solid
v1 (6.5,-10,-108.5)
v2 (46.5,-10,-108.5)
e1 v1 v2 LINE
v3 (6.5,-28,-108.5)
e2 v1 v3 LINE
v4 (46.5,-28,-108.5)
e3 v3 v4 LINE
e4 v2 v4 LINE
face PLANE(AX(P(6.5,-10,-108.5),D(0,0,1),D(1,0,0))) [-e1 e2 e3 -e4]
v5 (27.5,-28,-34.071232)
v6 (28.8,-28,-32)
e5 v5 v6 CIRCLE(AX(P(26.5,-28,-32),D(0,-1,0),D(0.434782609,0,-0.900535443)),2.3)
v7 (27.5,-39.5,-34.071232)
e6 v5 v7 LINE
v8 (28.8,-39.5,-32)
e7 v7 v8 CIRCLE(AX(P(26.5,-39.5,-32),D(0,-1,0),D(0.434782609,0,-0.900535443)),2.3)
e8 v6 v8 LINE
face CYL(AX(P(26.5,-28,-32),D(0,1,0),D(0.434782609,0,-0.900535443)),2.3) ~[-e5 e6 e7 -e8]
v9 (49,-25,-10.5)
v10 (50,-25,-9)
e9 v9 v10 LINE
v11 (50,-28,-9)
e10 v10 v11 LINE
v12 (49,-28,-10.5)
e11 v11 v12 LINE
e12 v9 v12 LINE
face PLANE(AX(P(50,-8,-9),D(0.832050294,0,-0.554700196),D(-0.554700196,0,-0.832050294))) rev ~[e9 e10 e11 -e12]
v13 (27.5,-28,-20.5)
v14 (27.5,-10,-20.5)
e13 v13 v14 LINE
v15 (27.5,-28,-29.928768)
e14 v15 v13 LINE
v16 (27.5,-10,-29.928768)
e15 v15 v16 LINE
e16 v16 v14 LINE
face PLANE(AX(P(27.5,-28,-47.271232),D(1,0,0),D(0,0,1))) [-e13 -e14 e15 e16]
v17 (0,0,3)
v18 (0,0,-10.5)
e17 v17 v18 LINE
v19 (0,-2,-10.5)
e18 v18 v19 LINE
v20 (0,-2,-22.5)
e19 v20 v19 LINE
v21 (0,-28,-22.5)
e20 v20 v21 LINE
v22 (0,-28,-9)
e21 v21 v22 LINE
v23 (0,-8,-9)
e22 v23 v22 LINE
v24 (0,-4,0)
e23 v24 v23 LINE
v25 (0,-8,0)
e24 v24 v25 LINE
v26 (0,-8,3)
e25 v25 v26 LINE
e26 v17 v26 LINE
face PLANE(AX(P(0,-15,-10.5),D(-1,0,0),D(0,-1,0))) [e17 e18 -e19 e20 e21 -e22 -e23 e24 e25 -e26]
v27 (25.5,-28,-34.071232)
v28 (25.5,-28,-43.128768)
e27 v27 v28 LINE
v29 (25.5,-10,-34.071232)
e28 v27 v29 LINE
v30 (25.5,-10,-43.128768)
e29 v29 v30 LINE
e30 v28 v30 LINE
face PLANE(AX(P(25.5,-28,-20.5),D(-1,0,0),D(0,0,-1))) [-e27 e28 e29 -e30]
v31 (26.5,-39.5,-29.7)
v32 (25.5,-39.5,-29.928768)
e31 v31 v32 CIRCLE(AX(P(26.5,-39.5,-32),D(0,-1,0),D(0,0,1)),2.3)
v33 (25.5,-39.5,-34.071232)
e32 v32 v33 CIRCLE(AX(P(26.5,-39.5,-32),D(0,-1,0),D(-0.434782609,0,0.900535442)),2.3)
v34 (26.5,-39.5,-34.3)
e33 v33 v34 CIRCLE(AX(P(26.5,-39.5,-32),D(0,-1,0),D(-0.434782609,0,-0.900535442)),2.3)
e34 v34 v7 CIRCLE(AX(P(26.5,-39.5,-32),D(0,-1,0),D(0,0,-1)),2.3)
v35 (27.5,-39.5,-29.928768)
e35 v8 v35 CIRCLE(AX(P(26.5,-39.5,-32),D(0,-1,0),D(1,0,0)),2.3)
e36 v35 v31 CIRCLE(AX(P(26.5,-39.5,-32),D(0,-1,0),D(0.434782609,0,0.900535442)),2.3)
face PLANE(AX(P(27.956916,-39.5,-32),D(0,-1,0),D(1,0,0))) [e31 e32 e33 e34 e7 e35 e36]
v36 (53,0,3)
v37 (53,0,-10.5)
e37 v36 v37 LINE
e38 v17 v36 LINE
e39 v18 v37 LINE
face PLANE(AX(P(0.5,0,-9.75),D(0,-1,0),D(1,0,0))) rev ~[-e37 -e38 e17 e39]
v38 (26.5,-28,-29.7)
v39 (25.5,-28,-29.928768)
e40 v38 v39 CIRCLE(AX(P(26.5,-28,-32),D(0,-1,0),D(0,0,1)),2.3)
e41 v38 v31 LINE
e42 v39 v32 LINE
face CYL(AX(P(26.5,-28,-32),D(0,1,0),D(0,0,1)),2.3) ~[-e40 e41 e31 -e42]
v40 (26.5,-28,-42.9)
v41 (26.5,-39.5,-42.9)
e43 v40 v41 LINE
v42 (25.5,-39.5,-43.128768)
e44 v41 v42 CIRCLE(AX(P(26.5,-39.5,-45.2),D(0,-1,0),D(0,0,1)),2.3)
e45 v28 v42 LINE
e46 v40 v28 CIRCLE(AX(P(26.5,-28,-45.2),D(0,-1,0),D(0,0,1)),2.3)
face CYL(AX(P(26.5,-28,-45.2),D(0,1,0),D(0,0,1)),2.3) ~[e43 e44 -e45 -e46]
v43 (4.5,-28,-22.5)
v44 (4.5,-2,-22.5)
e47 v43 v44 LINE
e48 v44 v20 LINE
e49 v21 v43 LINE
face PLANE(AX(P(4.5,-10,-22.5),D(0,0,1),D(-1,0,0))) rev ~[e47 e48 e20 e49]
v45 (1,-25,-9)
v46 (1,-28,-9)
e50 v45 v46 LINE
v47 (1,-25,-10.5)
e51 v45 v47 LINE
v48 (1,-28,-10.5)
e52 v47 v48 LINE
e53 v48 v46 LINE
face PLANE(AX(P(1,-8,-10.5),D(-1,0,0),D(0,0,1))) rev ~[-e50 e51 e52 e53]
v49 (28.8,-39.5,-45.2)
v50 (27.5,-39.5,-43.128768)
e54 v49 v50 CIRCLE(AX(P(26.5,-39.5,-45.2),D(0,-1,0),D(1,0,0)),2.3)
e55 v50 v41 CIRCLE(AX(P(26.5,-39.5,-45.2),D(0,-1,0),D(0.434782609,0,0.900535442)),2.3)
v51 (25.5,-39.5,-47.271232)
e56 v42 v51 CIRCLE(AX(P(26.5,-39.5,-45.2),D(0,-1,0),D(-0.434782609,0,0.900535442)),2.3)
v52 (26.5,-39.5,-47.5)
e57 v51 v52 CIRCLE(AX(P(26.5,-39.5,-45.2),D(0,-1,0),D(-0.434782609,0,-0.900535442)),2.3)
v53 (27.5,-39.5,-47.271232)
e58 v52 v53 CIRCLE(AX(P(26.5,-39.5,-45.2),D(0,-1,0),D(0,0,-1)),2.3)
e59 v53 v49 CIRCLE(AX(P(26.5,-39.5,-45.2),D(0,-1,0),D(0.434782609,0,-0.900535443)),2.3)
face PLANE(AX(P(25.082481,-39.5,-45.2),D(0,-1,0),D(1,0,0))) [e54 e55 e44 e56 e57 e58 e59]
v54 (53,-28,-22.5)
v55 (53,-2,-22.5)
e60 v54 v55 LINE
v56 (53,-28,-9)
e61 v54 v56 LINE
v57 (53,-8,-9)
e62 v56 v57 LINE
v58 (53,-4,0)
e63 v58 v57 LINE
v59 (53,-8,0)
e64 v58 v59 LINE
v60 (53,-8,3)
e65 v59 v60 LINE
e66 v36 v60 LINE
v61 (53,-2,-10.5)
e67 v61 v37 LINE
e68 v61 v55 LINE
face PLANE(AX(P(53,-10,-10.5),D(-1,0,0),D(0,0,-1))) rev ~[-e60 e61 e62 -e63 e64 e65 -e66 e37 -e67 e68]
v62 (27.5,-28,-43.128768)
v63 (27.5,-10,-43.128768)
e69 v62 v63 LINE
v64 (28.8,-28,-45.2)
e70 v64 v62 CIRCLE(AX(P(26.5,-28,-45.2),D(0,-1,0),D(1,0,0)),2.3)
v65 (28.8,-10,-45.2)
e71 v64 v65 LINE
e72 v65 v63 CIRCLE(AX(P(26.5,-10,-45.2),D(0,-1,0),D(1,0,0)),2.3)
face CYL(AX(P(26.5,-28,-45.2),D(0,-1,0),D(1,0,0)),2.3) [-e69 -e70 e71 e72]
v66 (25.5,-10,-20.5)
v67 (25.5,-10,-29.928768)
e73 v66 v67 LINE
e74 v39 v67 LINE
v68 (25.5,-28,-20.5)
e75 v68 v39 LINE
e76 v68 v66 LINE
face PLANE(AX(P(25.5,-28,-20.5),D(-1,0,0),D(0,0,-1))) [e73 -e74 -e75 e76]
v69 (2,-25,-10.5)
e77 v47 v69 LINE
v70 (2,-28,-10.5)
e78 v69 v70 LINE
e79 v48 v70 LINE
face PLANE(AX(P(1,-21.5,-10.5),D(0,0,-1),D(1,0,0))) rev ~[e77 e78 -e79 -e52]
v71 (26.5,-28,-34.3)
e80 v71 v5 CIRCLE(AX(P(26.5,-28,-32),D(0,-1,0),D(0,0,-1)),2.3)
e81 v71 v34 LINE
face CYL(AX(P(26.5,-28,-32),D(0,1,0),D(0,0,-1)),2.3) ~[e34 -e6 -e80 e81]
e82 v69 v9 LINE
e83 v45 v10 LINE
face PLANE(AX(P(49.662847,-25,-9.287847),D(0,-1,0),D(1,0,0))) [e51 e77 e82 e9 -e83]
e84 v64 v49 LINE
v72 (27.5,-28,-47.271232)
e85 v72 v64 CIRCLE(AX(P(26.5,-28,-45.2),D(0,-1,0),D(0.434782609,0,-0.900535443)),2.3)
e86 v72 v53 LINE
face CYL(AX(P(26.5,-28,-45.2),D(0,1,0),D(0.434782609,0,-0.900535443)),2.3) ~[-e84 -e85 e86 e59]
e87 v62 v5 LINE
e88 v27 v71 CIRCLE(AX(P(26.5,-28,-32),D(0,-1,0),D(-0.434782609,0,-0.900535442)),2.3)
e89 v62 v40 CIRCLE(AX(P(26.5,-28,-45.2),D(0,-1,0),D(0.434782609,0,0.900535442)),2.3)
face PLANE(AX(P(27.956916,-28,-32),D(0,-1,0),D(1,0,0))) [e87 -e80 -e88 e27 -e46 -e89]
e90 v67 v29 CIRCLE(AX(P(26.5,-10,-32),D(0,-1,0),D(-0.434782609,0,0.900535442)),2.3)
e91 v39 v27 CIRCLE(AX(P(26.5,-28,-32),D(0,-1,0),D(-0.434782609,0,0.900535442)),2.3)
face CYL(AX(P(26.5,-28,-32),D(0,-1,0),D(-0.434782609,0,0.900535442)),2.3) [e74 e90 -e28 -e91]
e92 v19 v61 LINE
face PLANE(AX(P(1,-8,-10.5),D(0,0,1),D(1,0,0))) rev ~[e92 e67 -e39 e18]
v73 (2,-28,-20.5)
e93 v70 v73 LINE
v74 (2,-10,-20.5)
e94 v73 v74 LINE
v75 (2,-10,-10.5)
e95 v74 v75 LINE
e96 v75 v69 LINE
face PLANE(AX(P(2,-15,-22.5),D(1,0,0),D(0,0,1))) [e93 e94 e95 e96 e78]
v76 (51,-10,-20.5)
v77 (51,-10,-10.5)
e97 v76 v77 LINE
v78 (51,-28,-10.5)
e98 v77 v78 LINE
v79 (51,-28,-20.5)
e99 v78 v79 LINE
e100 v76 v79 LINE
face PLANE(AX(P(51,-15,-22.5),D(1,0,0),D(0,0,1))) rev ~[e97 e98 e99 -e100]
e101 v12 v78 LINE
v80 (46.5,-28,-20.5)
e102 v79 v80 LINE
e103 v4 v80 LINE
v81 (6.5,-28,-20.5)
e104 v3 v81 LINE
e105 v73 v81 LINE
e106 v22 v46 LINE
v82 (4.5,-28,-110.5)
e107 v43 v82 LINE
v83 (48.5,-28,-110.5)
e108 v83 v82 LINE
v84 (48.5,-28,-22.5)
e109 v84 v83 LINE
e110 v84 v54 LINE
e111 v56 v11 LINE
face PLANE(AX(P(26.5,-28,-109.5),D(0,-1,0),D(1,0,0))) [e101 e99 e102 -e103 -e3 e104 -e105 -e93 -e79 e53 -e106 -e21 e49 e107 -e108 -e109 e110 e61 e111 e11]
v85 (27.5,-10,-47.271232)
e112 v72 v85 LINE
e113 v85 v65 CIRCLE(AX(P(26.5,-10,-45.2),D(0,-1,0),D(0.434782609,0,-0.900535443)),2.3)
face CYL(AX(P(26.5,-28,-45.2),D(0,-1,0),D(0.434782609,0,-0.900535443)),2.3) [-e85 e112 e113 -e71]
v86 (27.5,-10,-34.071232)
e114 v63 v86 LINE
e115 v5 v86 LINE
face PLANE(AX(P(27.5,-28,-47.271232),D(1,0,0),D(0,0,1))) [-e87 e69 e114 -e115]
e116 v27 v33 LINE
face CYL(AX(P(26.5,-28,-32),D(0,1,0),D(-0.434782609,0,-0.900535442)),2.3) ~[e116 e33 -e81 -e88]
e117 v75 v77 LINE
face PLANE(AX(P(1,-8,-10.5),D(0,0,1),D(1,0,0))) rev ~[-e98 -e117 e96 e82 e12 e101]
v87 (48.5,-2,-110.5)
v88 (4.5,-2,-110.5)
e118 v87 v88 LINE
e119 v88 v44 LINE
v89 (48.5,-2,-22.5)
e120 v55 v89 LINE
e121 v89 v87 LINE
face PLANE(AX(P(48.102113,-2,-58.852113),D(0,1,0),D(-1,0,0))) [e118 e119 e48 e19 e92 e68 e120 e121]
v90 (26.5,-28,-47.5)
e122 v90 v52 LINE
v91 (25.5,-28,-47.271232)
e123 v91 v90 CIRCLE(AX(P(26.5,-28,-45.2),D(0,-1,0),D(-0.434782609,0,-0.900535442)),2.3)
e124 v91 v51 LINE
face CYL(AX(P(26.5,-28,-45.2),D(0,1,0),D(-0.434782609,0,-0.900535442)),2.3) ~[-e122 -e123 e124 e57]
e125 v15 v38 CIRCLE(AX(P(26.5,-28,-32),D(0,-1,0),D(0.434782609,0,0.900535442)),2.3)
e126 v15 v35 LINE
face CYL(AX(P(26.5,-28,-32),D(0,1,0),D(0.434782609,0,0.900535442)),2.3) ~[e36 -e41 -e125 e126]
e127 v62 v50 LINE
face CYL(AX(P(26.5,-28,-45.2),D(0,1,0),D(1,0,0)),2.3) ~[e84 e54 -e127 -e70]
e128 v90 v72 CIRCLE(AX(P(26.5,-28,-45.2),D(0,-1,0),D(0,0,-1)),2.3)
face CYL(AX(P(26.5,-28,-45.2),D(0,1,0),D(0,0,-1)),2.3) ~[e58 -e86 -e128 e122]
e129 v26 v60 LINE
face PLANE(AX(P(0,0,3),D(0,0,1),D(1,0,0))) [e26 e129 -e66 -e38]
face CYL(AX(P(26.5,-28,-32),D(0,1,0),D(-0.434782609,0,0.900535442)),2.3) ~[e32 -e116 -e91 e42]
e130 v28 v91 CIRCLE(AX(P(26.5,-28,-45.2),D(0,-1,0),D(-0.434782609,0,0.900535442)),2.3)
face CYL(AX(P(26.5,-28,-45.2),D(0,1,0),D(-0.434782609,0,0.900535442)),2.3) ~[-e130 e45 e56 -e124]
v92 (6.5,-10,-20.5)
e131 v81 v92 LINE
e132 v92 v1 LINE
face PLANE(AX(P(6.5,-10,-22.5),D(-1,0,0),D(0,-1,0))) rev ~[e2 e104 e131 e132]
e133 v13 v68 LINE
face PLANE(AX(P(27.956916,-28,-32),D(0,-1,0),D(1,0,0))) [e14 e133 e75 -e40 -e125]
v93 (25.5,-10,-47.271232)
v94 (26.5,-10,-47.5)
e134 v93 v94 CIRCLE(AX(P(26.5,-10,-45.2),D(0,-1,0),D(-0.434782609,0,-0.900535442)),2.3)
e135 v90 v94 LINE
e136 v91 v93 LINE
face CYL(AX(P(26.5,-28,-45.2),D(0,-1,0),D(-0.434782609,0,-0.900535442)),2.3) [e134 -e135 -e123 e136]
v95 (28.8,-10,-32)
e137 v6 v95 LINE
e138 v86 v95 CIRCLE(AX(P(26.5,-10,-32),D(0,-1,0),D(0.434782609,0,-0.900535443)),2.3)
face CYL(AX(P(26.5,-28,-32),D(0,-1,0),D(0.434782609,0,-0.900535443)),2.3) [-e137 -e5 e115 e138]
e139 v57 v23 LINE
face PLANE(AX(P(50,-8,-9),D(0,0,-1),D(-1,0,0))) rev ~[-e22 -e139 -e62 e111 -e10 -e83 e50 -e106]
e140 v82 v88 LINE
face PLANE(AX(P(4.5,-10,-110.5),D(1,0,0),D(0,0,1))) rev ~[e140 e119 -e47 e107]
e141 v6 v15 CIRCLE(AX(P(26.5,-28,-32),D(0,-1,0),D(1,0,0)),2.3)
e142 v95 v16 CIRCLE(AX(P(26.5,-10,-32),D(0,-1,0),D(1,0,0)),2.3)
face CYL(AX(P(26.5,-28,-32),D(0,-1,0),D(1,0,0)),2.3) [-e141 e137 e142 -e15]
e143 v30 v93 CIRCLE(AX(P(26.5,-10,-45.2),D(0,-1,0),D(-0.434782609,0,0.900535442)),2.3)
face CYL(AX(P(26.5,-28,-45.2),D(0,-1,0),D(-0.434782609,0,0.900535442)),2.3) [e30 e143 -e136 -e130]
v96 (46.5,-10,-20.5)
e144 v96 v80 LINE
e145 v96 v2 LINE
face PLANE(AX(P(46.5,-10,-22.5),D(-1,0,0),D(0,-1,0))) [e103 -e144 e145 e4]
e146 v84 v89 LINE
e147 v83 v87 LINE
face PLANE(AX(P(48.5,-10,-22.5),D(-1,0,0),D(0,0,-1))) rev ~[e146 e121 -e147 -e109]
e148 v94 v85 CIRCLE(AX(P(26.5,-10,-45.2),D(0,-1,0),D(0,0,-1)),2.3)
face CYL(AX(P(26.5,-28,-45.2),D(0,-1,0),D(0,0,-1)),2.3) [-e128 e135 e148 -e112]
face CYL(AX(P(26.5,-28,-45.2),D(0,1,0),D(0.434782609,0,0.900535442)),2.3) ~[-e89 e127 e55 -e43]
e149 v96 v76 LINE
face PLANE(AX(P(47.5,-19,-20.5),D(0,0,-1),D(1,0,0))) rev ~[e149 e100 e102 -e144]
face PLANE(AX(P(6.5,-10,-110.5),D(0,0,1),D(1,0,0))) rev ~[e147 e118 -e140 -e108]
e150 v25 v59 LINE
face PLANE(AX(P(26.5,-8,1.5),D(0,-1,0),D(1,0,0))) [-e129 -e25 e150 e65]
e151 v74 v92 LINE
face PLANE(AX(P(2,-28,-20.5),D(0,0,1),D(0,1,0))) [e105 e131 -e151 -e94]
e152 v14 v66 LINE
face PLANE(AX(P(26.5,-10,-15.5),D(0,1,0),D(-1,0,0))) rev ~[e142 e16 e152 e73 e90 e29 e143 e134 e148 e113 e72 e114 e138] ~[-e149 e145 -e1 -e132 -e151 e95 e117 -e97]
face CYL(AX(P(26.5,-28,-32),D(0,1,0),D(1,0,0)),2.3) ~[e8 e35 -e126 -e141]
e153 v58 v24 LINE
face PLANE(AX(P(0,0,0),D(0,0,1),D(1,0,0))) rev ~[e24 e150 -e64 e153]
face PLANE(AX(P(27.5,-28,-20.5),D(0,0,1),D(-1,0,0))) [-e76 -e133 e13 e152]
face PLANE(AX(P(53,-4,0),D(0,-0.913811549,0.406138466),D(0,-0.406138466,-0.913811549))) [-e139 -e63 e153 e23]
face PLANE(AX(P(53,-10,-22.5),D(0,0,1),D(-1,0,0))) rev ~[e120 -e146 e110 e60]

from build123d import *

# Parameters (mm, degrees)
F0_W      = 53
F0_H      = 3
F1_DEPTH  = 8
F3_DEPTH  = 53
F5_DEPTH  = 8
F6_DEPTH  = 17
F7_DEPTH  = 20
F8_W      = 1
F8_H      = 1.5
F9_DEPTH  = 8
F10_DEPTH = 20
F11_DEPTH = 17
F12_W     = 2
F12_H     = 13
F13_DEPTH = 12
F14_W     = 18
F14_H     = 2
F15_DEPTH = 2.5
F16_DEPTH = 8
F17_DEPTH = 17
F18_W     = 2
F18_H     = 18
F19_DEPTH = 2
F20_DEPTH = 88
F21_W     = 2
F21_H     = 13
F22_DEPTH = 12
F23_W     = 18
F23_H     = 2
F24_DEPTH = 4.5
F25_W     = 2
F25_H     = 18
F26_DEPTH = 88
F27_W     = 2
F27_H     = 12
F28_DEPTH = 5
F29_W     = 2
F29_H     = 12
F30_DEPTH = 5
F31_W     = 40
F31_H     = 88
F31_H_2   = 2
F32_DEPTH = 8
F34_DEPTH = 18
F35_DEPTH = 26
F36_DEPTH = 4
F37_DEPTH = 11.5
F38_W     = 40
F38_H     = 2
F39_DEPTH = 18


# Not quite as in the source:
# - a feature names something its author has since deleted; it is built from what else it names


with BuildPart() as f1:
    # F0 (on Front) → F1 (new body)
    with BuildSketch(Plane.XZ):
        with Locations((26.5, 1.5)):
            Rectangle(F0_W, F0_H)
    extrude(amount=F1_DEPTH)

    # F2 (on face) → F3 (join)
    with BuildSketch(Plane.YZ.offset(53)):
        Polygon((0, -9), (0, 0), (-4, 0), (-8, -9), align=None)
    extrude(amount=-F3_DEPTH)

    # F4 (on face) → F5 (join)
    with BuildSketch(Plane.XZ.offset(8)):
        Polygon((53, -10), (53, -9), (50, -9), (49.5, -9.75), (49, -10.5), (50, -10.5), (53, -10.5), align=None)
    extrude(amount=-F5_DEPTH)

    # F4 (on face) → F6 (join)
    with BuildSketch(Plane.XZ.offset(8)):
        Polygon((53, -10), (53, -9), (50, -9), (49.5, -9.75), (49, -10.5), (50, -10.5), (53, -10.5), align=None)
    extrude(amount=F6_DEPTH)

    # F4 (on face) → F7 (join)
    with BuildSketch(Plane.XZ.offset(8)):
        Polygon((53, -10), (53, -9), (50, -9), (49.5, -9.75), (49, -10.5), (50, -10.5), (53, -10.5), align=None)
    extrude(amount=F7_DEPTH)

    # F8 (on face) → F9 (join)
    with BuildSketch(Plane.XZ.offset(8)):
        with Locations((0.5, -9.75)):
            Rectangle(F8_W, F8_H)
        Polygon((8, -9), (1, -9), (1, -10.5), (8, -10.5), (49.5, -10.5), (49.5, -9), align=None)
    extrude(amount=-F9_DEPTH)

    # F8 (on face) → F10 (join)
    with BuildSketch(Plane.XZ.offset(8)):
        with Locations((0.5, -9.75)):
            Rectangle(F8_W, F8_H)
    extrude(amount=F10_DEPTH)

    # F8 (on face) → F11 (join)
    with BuildSketch(Plane.XZ.offset(8)):
        Polygon((8, -9), (1, -9), (1, -10.5), (8, -10.5), (49.5, -10.5), (49.5, -9), align=None)
    extrude(amount=F11_DEPTH)

    # F12 (on face) → F13 (join)
    with BuildSketch(Plane(origin=(0, 0, -10.5), x_dir=(1, 0, 0), z_dir=(0, 0, -1))):
        with Locations((52, 21.5)):
            Rectangle(F12_W, F12_H)
    extrude(amount=F13_DEPTH)

    # F14 (on face) → F15 (join)
    with BuildSketch(Plane(origin=(51, 0, 0), x_dir=(0, -1, 0), z_dir=(-1, 0, 0))):
        with Locations((19, -21.5)):
            Rectangle(F14_W, F14_H)
    extrude(amount=F15_DEPTH)

    # F4 (on face) → F16 (join)
    with BuildSketch(Plane.XZ.offset(8)):
        Polygon((49.5, -9.75), (50, -9), (49.5, -9), align=None)
    extrude(amount=-F16_DEPTH)

    # F4 (on face) → F17 (join)
    with BuildSketch(Plane.XZ.offset(8)):
        Polygon((49.5, -9.75), (50, -9), (49.5, -9), align=None)
    extrude(amount=F17_DEPTH)

    # F18 (on face) → F19 (join)
    with BuildSketch(Plane(origin=(0, 0, -22.5), x_dir=(1, 0, 0), z_dir=(0, 0, -1))):
        with Locations((47.5, 19)):
            Rectangle(F18_W, F18_H)
    extrude(amount=-F19_DEPTH)

    # F18 (on face) → F20 (join)
    with BuildSketch(Plane(origin=(0, 0, -22.5), x_dir=(1, 0, 0), z_dir=(0, 0, -1))):
        with Locations((47.5, 19)):
            Rectangle(F18_W, F18_H)
    extrude(amount=F20_DEPTH)

    # F21 (on face) → F22 (join)
    with BuildSketch(Plane(origin=(0, 0, -10.5), x_dir=(1, 0, 0), z_dir=(0, 0, -1))):
        with Locations((1, 21.5)):
            Rectangle(F21_W, F21_H)
    extrude(amount=F22_DEPTH)

    # F23 (on face) → F24 (join)
    with BuildSketch(Plane.YZ.offset(2)):
        with Locations((-19, -21.5)):
            Rectangle(F23_W, F23_H)
    extrude(amount=F24_DEPTH)

    # F25 (on face) → F26 (join)
    with BuildSketch(Plane(origin=(0, 0, -22.5), x_dir=(1, 0, 0), z_dir=(0, 0, -1))):
        with Locations((5.5, 19)):
            Rectangle(F25_W, F25_H)
    extrude(amount=F26_DEPTH)

    # F27 (on face) → F28 (join)
    with BuildSketch(Plane(origin=(0, -15, 0), x_dir=(-1, 0, 0), z_dir=(0, 1, 0))):
        with Locations((-1, -16.5)):
            Rectangle(F27_W, F27_H)
    extrude(amount=F28_DEPTH)

    # F29 (on face) → F30 (join)
    with BuildSketch(Plane(origin=(0, -15, 0), x_dir=(-1, 0, 0), z_dir=(0, 1, 0))):
        with Locations((-52, -16.5)):
            Rectangle(F29_W, F29_H)
    extrude(amount=F30_DEPTH)

    # F30_face (on face) + F31 (on face) → F32 (join)
    with BuildSketch(Plane(origin=(48.0705741627, -10, -58.8205741627), x_dir=(-1, 0, 0), z_dir=(0, 1, 0))):
        Polygon((-2.9294258373, 38.3205741627), (-2.9294258373, 48.3205741627), (-4.9294258373, 48.3205741627), (-4.9294258373, 36.3205741627), (-0.4294258373, 36.3205741627), (-0.4294258373, -51.6794258373), (1.5705741627, -51.6794258373), (1.5705741627, 38.3205741627), align=None)
    with BuildSketch(Plane(origin=(0, -10, 0), x_dir=(-1, 0, 0), z_dir=(0, 1, 0))):
        Polygon((-2, -20.5), (-2, -10.5), (-51, -10.5), (-51, -20.5), (-46.5, -20.5), (-6.5, -20.5), align=None)
        Polygon((0, -10.5), (-2, -10.5), (-2, -20.5), (-6.5, -20.5), (-6.5, -108.5), (-6.5, -110.5), (-4.5, -110.5), (-4.5, -22.5), (0, -22.5), align=None)
        with Locations((-26.5, -64.5)):
            Rectangle(F31_W, F31_H)
        with Locations((-26.5, -109.5)):
            Rectangle(F31_W, F31_H_2)
    extrude(amount=F32_DEPTH)

    # F33 (on face) → F34 (join)
    with BuildSketch(Plane.XZ.offset(28)):
        with BuildLine():
            ThreePointArc((26.5, -42.9), (25.9870830919, -42.9579214453), (25.5, -43.1287684823))
            Line((25.5, -43.1287684823), (25.5, -47.2712315177))
            ThreePointArc((25.5, -47.2712315177), (25.9870830919, -47.4420785547), (26.5, -47.5))
            Line((26.5, -47.5), (26.5, -42.9))
        make_face()
        with BuildLine():
            ThreePointArc((27.5, -43.1287684823), (27.0129169081, -42.9579214453), (26.5, -42.9))
            Line((26.5, -42.9), (26.5, -47.5))
            ThreePointArc((26.5, -47.5), (27.0129169081, -47.4420785547), (27.5, -47.2712315177))
            Line((27.5, -47.2712315177), (27.5, -43.1287684823))
        make_face()
        with BuildLine():
            ThreePointArc((27.5, -34.0712315177), (27.0129169081, -34.2420785547), (26.5, -34.3))
            Line((26.5, -34.3), (26.5, -42.9))
            ThreePointArc((26.5, -42.9), (27.0129169081, -42.9579214453), (27.5, -43.1287684823))
            Line((27.5, -43.1287684823), (27.5, -34.0712315177))
        make_face()
        with BuildLine():
            ThreePointArc((26.5, -34.3), (25.9870830919, -34.2420785547), (25.5, -34.0712315177))
            Line((25.5, -34.0712315177), (25.5, -43.1287684823))
            ThreePointArc((25.5, -43.1287684823), (25.9870830919, -42.9579214453), (26.5, -42.9))
            Line((26.5, -42.9), (26.5, -34.3))
        make_face()
        with BuildLine():
            ThreePointArc((26.5, -29.7), (25.9870830919, -29.7579214453), (25.5, -29.9287684823))
            Line((25.5, -29.9287684823), (25.5, -34.0712315177))
            ThreePointArc((25.5, -34.0712315177), (25.9870830919, -34.2420785547), (26.5, -34.3))
            Line((26.5, -34.3), (26.5, -29.7))
        make_face()
        with BuildLine():
            ThreePointArc((27.5, -29.9287684823), (27.0129169081, -29.7579214453), (26.5, -29.7))
            Line((26.5, -29.7), (26.5, -34.3))
            ThreePointArc((26.5, -34.3), (27.0129169081, -34.2420785547), (27.5, -34.0712315177))
            Line((27.5, -34.0712315177), (27.5, -29.9287684823))
        make_face()
        with BuildLine():
            Line((27.5, -20.5), (26.5, -20.5))
            Line((26.5, -20.5), (26.5, -29.7))
            ThreePointArc((26.5, -29.7), (27.0129169081, -29.7579214453), (27.5, -29.9287684823))
            Line((27.5, -29.9287684823), (27.5, -20.5))
        make_face()
        with BuildLine():
            Line((26.5, -20.5), (25.5, -20.5))
            Line((25.5, -20.5), (25.5, -29.9287684823))
            ThreePointArc((25.5, -29.9287684823), (25.9870830919, -29.7579214453), (26.5, -29.7))
            Line((26.5, -29.7), (26.5, -20.5))
        make_face()
    extrude(amount=-F34_DEPTH)

    # F33 (on face) → F35 (join)
    with BuildSketch(Plane.XZ.offset(28)):
        with BuildLine():
            ThreePointArc((28.8, -32), (28.4480759739, -30.7772980739), (27.5, -29.9287684823))
            Line((27.5, -29.9287684823), (27.5, -34.0712315177))
            ThreePointArc((27.5, -34.0712315177), (28.4480759739, -33.2227019261), (28.8, -32))
        make_face()
        with BuildLine():
            ThreePointArc((27.5, -29.9287684823), (27.0129169081, -29.7579214453), (26.5, -29.7))
            Line((26.5, -29.7), (26.5, -34.3))
            ThreePointArc((26.5, -34.3), (27.0129169081, -34.2420785547), (27.5, -34.0712315177))
            Line((27.5, -34.0712315177), (27.5, -29.9287684823))
        make_face()
        with BuildLine():
            ThreePointArc((26.5, -29.7), (25.9870830919, -29.7579214453), (25.5, -29.9287684823))
            Line((25.5, -29.9287684823), (25.5, -34.0712315177))
            ThreePointArc((25.5, -34.0712315177), (25.9870830919, -34.2420785547), (26.5, -34.3))
            Line((26.5, -34.3), (26.5, -29.7))
        make_face()
        with BuildLine():
            Line((25.5, -34.0712315177), (25.5, -29.9287684823))
            ThreePointArc((25.5, -29.9287684823), (24.2, -32), (25.5, -34.0712315177))
        make_face()
        with BuildLine():
            ThreePointArc((26.5, -42.9), (25.9870830919, -42.9579214453), (25.5, -43.1287684823))
            Line((25.5, -43.1287684823), (25.5, -47.2712315177))
            ThreePointArc((25.5, -47.2712315177), (25.9870830919, -47.4420785547), (26.5, -47.5))
            Line((26.5, -47.5), (26.5, -42.9))
        make_face()
        with BuildLine():
            Line((25.5, -47.2712315177), (25.5, -43.1287684823))
            ThreePointArc((25.5, -43.1287684823), (24.2, -45.2), (25.5, -47.2712315177))
        make_face()
        with BuildLine():
            ThreePointArc((27.5, -43.1287684823), (27.0129169081, -42.9579214453), (26.5, -42.9))
            Line((26.5, -42.9), (26.5, -47.5))
            ThreePointArc((26.5, -47.5), (27.0129169081, -47.4420785547), (27.5, -47.2712315177))
            Line((27.5, -47.2712315177), (27.5, -43.1287684823))
        make_face()
        with BuildLine():
            ThreePointArc((28.8, -45.2), (28.4480759739, -43.9772980739), (27.5, -43.1287684823))
            Line((27.5, -43.1287684823), (27.5, -47.2712315177))
            ThreePointArc((27.5, -47.2712315177), (28.4480759739, -46.4227019261), (28.8, -45.2))
        make_face()
    extrude(amount=-F35_DEPTH)

    # F33 (on face) → F36 (cut)
    with BuildSketch(Plane.XZ.offset(28)):
        with BuildLine():
            Line((27.5, -20.5), (26.5, -20.5))
            Line((26.5, -20.5), (26.5, -29.7))
            ThreePointArc((26.5, -29.7), (27.0129169081, -29.7579214453), (27.5, -29.9287684823))
            Line((27.5, -29.9287684823), (27.5, -20.5))
        make_face()
        with BuildLine():
            Line((26.5, -20.5), (25.5, -20.5))
            Line((25.5, -20.5), (25.5, -29.9287684823))
            ThreePointArc((25.5, -29.9287684823), (25.9870830919, -29.7579214453), (26.5, -29.7))
            Line((26.5, -29.7), (26.5, -20.5))
        make_face()
        with BuildLine():
            ThreePointArc((26.5, -29.7), (25.9870830919, -29.7579214453), (25.5, -29.9287684823))
            Line((25.5, -29.9287684823), (25.5, -34.0712315177))
            ThreePointArc((25.5, -34.0712315177), (25.9870830919, -34.2420785547), (26.5, -34.3))
            Line((26.5, -34.3), (26.5, -29.7))
        make_face()
        with BuildLine():
            ThreePointArc((27.5, -29.9287684823), (27.0129169081, -29.7579214453), (26.5, -29.7))
            Line((26.5, -29.7), (26.5, -34.3))
            ThreePointArc((26.5, -34.3), (27.0129169081, -34.2420785547), (27.5, -34.0712315177))
            Line((27.5, -34.0712315177), (27.5, -29.9287684823))
        make_face()
        with BuildLine():
            ThreePointArc((27.5, -34.0712315177), (27.0129169081, -34.2420785547), (26.5, -34.3))
            Line((26.5, -34.3), (26.5, -42.9))
            ThreePointArc((26.5, -42.9), (27.0129169081, -42.9579214453), (27.5, -43.1287684823))
            Line((27.5, -43.1287684823), (27.5, -34.0712315177))
        make_face()
        with BuildLine():
            ThreePointArc((26.5, -34.3), (25.9870830919, -34.2420785547), (25.5, -34.0712315177))
            Line((25.5, -34.0712315177), (25.5, -43.1287684823))
            ThreePointArc((25.5, -43.1287684823), (25.9870830919, -42.9579214453), (26.5, -42.9))
            Line((26.5, -42.9), (26.5, -34.3))
        make_face()
        with BuildLine():
            ThreePointArc((26.5, -42.9), (25.9870830919, -42.9579214453), (25.5, -43.1287684823))
            Line((25.5, -43.1287684823), (25.5, -47.2712315177))
            ThreePointArc((25.5, -47.2712315177), (25.9870830919, -47.4420785547), (26.5, -47.5))
            Line((26.5, -47.5), (26.5, -42.9))
        make_face()
        with BuildLine():
            ThreePointArc((27.5, -43.1287684823), (27.0129169081, -42.9579214453), (26.5, -42.9))
            Line((26.5, -42.9), (26.5, -47.5))
            ThreePointArc((26.5, -47.5), (27.0129169081, -47.4420785547), (27.5, -47.2712315177))
            Line((27.5, -47.2712315177), (27.5, -43.1287684823))
        make_face()
    extrude(amount=F36_DEPTH, mode=Mode.SUBTRACT)

    # F33 (on face) → F37 (join)
    with BuildSketch(Plane.XZ.offset(28)):
        with BuildLine():
            ThreePointArc((28.8, -32), (28.4480759739, -30.7772980739), (27.5, -29.9287684823))
            Line((27.5, -29.9287684823), (27.5, -34.0712315177))
            ThreePointArc((27.5, -34.0712315177), (28.4480759739, -33.2227019261), (28.8, -32))
        make_face()
        with BuildLine():
            ThreePointArc((27.5, -29.9287684823), (27.0129169081, -29.7579214453), (26.5, -29.7))
            Line((26.5, -29.7), (26.5, -34.3))
            ThreePointArc((26.5, -34.3), (27.0129169081, -34.2420785547), (27.5, -34.0712315177))
            Line((27.5, -34.0712315177), (27.5, -29.9287684823))
        make_face()
        with BuildLine():
            ThreePointArc((26.5, -29.7), (25.9870830919, -29.7579214453), (25.5, -29.9287684823))
            Line((25.5, -29.9287684823), (25.5, -34.0712315177))
            ThreePointArc((25.5, -34.0712315177), (25.9870830919, -34.2420785547), (26.5, -34.3))
            Line((26.5, -34.3), (26.5, -29.7))
        make_face()
        with BuildLine():
            Line((25.5, -34.0712315177), (25.5, -29.9287684823))
            ThreePointArc((25.5, -29.9287684823), (24.2, -32), (25.5, -34.0712315177))
        make_face()
        with BuildLine():
            Line((25.5, -47.2712315177), (25.5, -43.1287684823))
            ThreePointArc((25.5, -43.1287684823), (24.2, -45.2), (25.5, -47.2712315177))
        make_face()
        with BuildLine():
            ThreePointArc((26.5, -42.9), (25.9870830919, -42.9579214453), (25.5, -43.1287684823))
            Line((25.5, -43.1287684823), (25.5, -47.2712315177))
            ThreePointArc((25.5, -47.2712315177), (25.9870830919, -47.4420785547), (26.5, -47.5))
            Line((26.5, -47.5), (26.5, -42.9))
        make_face()
        with BuildLine():
            ThreePointArc((27.5, -43.1287684823), (27.0129169081, -42.9579214453), (26.5, -42.9))
            Line((26.5, -42.9), (26.5, -47.5))
            ThreePointArc((26.5, -47.5), (27.0129169081, -47.4420785547), (27.5, -47.2712315177))
            Line((27.5, -47.2712315177), (27.5, -43.1287684823))
        make_face()
        with BuildLine():
            ThreePointArc((28.8, -45.2), (28.4480759739, -43.9772980739), (27.5, -43.1287684823))
            Line((27.5, -43.1287684823), (27.5, -47.2712315177))
            ThreePointArc((27.5, -47.2712315177), (28.4480759739, -46.4227019261), (28.8, -45.2))
        make_face()
    extrude(amount=F37_DEPTH)

    # F38 (on face) → F39 (join)
    with BuildSketch(Plane.XZ.offset(10)):
        with Locations((26.5, -109.5)):
            Rectangle(F38_W, F38_H)
    extrude(amount=F39_DEPTH)


solid = f1.part
